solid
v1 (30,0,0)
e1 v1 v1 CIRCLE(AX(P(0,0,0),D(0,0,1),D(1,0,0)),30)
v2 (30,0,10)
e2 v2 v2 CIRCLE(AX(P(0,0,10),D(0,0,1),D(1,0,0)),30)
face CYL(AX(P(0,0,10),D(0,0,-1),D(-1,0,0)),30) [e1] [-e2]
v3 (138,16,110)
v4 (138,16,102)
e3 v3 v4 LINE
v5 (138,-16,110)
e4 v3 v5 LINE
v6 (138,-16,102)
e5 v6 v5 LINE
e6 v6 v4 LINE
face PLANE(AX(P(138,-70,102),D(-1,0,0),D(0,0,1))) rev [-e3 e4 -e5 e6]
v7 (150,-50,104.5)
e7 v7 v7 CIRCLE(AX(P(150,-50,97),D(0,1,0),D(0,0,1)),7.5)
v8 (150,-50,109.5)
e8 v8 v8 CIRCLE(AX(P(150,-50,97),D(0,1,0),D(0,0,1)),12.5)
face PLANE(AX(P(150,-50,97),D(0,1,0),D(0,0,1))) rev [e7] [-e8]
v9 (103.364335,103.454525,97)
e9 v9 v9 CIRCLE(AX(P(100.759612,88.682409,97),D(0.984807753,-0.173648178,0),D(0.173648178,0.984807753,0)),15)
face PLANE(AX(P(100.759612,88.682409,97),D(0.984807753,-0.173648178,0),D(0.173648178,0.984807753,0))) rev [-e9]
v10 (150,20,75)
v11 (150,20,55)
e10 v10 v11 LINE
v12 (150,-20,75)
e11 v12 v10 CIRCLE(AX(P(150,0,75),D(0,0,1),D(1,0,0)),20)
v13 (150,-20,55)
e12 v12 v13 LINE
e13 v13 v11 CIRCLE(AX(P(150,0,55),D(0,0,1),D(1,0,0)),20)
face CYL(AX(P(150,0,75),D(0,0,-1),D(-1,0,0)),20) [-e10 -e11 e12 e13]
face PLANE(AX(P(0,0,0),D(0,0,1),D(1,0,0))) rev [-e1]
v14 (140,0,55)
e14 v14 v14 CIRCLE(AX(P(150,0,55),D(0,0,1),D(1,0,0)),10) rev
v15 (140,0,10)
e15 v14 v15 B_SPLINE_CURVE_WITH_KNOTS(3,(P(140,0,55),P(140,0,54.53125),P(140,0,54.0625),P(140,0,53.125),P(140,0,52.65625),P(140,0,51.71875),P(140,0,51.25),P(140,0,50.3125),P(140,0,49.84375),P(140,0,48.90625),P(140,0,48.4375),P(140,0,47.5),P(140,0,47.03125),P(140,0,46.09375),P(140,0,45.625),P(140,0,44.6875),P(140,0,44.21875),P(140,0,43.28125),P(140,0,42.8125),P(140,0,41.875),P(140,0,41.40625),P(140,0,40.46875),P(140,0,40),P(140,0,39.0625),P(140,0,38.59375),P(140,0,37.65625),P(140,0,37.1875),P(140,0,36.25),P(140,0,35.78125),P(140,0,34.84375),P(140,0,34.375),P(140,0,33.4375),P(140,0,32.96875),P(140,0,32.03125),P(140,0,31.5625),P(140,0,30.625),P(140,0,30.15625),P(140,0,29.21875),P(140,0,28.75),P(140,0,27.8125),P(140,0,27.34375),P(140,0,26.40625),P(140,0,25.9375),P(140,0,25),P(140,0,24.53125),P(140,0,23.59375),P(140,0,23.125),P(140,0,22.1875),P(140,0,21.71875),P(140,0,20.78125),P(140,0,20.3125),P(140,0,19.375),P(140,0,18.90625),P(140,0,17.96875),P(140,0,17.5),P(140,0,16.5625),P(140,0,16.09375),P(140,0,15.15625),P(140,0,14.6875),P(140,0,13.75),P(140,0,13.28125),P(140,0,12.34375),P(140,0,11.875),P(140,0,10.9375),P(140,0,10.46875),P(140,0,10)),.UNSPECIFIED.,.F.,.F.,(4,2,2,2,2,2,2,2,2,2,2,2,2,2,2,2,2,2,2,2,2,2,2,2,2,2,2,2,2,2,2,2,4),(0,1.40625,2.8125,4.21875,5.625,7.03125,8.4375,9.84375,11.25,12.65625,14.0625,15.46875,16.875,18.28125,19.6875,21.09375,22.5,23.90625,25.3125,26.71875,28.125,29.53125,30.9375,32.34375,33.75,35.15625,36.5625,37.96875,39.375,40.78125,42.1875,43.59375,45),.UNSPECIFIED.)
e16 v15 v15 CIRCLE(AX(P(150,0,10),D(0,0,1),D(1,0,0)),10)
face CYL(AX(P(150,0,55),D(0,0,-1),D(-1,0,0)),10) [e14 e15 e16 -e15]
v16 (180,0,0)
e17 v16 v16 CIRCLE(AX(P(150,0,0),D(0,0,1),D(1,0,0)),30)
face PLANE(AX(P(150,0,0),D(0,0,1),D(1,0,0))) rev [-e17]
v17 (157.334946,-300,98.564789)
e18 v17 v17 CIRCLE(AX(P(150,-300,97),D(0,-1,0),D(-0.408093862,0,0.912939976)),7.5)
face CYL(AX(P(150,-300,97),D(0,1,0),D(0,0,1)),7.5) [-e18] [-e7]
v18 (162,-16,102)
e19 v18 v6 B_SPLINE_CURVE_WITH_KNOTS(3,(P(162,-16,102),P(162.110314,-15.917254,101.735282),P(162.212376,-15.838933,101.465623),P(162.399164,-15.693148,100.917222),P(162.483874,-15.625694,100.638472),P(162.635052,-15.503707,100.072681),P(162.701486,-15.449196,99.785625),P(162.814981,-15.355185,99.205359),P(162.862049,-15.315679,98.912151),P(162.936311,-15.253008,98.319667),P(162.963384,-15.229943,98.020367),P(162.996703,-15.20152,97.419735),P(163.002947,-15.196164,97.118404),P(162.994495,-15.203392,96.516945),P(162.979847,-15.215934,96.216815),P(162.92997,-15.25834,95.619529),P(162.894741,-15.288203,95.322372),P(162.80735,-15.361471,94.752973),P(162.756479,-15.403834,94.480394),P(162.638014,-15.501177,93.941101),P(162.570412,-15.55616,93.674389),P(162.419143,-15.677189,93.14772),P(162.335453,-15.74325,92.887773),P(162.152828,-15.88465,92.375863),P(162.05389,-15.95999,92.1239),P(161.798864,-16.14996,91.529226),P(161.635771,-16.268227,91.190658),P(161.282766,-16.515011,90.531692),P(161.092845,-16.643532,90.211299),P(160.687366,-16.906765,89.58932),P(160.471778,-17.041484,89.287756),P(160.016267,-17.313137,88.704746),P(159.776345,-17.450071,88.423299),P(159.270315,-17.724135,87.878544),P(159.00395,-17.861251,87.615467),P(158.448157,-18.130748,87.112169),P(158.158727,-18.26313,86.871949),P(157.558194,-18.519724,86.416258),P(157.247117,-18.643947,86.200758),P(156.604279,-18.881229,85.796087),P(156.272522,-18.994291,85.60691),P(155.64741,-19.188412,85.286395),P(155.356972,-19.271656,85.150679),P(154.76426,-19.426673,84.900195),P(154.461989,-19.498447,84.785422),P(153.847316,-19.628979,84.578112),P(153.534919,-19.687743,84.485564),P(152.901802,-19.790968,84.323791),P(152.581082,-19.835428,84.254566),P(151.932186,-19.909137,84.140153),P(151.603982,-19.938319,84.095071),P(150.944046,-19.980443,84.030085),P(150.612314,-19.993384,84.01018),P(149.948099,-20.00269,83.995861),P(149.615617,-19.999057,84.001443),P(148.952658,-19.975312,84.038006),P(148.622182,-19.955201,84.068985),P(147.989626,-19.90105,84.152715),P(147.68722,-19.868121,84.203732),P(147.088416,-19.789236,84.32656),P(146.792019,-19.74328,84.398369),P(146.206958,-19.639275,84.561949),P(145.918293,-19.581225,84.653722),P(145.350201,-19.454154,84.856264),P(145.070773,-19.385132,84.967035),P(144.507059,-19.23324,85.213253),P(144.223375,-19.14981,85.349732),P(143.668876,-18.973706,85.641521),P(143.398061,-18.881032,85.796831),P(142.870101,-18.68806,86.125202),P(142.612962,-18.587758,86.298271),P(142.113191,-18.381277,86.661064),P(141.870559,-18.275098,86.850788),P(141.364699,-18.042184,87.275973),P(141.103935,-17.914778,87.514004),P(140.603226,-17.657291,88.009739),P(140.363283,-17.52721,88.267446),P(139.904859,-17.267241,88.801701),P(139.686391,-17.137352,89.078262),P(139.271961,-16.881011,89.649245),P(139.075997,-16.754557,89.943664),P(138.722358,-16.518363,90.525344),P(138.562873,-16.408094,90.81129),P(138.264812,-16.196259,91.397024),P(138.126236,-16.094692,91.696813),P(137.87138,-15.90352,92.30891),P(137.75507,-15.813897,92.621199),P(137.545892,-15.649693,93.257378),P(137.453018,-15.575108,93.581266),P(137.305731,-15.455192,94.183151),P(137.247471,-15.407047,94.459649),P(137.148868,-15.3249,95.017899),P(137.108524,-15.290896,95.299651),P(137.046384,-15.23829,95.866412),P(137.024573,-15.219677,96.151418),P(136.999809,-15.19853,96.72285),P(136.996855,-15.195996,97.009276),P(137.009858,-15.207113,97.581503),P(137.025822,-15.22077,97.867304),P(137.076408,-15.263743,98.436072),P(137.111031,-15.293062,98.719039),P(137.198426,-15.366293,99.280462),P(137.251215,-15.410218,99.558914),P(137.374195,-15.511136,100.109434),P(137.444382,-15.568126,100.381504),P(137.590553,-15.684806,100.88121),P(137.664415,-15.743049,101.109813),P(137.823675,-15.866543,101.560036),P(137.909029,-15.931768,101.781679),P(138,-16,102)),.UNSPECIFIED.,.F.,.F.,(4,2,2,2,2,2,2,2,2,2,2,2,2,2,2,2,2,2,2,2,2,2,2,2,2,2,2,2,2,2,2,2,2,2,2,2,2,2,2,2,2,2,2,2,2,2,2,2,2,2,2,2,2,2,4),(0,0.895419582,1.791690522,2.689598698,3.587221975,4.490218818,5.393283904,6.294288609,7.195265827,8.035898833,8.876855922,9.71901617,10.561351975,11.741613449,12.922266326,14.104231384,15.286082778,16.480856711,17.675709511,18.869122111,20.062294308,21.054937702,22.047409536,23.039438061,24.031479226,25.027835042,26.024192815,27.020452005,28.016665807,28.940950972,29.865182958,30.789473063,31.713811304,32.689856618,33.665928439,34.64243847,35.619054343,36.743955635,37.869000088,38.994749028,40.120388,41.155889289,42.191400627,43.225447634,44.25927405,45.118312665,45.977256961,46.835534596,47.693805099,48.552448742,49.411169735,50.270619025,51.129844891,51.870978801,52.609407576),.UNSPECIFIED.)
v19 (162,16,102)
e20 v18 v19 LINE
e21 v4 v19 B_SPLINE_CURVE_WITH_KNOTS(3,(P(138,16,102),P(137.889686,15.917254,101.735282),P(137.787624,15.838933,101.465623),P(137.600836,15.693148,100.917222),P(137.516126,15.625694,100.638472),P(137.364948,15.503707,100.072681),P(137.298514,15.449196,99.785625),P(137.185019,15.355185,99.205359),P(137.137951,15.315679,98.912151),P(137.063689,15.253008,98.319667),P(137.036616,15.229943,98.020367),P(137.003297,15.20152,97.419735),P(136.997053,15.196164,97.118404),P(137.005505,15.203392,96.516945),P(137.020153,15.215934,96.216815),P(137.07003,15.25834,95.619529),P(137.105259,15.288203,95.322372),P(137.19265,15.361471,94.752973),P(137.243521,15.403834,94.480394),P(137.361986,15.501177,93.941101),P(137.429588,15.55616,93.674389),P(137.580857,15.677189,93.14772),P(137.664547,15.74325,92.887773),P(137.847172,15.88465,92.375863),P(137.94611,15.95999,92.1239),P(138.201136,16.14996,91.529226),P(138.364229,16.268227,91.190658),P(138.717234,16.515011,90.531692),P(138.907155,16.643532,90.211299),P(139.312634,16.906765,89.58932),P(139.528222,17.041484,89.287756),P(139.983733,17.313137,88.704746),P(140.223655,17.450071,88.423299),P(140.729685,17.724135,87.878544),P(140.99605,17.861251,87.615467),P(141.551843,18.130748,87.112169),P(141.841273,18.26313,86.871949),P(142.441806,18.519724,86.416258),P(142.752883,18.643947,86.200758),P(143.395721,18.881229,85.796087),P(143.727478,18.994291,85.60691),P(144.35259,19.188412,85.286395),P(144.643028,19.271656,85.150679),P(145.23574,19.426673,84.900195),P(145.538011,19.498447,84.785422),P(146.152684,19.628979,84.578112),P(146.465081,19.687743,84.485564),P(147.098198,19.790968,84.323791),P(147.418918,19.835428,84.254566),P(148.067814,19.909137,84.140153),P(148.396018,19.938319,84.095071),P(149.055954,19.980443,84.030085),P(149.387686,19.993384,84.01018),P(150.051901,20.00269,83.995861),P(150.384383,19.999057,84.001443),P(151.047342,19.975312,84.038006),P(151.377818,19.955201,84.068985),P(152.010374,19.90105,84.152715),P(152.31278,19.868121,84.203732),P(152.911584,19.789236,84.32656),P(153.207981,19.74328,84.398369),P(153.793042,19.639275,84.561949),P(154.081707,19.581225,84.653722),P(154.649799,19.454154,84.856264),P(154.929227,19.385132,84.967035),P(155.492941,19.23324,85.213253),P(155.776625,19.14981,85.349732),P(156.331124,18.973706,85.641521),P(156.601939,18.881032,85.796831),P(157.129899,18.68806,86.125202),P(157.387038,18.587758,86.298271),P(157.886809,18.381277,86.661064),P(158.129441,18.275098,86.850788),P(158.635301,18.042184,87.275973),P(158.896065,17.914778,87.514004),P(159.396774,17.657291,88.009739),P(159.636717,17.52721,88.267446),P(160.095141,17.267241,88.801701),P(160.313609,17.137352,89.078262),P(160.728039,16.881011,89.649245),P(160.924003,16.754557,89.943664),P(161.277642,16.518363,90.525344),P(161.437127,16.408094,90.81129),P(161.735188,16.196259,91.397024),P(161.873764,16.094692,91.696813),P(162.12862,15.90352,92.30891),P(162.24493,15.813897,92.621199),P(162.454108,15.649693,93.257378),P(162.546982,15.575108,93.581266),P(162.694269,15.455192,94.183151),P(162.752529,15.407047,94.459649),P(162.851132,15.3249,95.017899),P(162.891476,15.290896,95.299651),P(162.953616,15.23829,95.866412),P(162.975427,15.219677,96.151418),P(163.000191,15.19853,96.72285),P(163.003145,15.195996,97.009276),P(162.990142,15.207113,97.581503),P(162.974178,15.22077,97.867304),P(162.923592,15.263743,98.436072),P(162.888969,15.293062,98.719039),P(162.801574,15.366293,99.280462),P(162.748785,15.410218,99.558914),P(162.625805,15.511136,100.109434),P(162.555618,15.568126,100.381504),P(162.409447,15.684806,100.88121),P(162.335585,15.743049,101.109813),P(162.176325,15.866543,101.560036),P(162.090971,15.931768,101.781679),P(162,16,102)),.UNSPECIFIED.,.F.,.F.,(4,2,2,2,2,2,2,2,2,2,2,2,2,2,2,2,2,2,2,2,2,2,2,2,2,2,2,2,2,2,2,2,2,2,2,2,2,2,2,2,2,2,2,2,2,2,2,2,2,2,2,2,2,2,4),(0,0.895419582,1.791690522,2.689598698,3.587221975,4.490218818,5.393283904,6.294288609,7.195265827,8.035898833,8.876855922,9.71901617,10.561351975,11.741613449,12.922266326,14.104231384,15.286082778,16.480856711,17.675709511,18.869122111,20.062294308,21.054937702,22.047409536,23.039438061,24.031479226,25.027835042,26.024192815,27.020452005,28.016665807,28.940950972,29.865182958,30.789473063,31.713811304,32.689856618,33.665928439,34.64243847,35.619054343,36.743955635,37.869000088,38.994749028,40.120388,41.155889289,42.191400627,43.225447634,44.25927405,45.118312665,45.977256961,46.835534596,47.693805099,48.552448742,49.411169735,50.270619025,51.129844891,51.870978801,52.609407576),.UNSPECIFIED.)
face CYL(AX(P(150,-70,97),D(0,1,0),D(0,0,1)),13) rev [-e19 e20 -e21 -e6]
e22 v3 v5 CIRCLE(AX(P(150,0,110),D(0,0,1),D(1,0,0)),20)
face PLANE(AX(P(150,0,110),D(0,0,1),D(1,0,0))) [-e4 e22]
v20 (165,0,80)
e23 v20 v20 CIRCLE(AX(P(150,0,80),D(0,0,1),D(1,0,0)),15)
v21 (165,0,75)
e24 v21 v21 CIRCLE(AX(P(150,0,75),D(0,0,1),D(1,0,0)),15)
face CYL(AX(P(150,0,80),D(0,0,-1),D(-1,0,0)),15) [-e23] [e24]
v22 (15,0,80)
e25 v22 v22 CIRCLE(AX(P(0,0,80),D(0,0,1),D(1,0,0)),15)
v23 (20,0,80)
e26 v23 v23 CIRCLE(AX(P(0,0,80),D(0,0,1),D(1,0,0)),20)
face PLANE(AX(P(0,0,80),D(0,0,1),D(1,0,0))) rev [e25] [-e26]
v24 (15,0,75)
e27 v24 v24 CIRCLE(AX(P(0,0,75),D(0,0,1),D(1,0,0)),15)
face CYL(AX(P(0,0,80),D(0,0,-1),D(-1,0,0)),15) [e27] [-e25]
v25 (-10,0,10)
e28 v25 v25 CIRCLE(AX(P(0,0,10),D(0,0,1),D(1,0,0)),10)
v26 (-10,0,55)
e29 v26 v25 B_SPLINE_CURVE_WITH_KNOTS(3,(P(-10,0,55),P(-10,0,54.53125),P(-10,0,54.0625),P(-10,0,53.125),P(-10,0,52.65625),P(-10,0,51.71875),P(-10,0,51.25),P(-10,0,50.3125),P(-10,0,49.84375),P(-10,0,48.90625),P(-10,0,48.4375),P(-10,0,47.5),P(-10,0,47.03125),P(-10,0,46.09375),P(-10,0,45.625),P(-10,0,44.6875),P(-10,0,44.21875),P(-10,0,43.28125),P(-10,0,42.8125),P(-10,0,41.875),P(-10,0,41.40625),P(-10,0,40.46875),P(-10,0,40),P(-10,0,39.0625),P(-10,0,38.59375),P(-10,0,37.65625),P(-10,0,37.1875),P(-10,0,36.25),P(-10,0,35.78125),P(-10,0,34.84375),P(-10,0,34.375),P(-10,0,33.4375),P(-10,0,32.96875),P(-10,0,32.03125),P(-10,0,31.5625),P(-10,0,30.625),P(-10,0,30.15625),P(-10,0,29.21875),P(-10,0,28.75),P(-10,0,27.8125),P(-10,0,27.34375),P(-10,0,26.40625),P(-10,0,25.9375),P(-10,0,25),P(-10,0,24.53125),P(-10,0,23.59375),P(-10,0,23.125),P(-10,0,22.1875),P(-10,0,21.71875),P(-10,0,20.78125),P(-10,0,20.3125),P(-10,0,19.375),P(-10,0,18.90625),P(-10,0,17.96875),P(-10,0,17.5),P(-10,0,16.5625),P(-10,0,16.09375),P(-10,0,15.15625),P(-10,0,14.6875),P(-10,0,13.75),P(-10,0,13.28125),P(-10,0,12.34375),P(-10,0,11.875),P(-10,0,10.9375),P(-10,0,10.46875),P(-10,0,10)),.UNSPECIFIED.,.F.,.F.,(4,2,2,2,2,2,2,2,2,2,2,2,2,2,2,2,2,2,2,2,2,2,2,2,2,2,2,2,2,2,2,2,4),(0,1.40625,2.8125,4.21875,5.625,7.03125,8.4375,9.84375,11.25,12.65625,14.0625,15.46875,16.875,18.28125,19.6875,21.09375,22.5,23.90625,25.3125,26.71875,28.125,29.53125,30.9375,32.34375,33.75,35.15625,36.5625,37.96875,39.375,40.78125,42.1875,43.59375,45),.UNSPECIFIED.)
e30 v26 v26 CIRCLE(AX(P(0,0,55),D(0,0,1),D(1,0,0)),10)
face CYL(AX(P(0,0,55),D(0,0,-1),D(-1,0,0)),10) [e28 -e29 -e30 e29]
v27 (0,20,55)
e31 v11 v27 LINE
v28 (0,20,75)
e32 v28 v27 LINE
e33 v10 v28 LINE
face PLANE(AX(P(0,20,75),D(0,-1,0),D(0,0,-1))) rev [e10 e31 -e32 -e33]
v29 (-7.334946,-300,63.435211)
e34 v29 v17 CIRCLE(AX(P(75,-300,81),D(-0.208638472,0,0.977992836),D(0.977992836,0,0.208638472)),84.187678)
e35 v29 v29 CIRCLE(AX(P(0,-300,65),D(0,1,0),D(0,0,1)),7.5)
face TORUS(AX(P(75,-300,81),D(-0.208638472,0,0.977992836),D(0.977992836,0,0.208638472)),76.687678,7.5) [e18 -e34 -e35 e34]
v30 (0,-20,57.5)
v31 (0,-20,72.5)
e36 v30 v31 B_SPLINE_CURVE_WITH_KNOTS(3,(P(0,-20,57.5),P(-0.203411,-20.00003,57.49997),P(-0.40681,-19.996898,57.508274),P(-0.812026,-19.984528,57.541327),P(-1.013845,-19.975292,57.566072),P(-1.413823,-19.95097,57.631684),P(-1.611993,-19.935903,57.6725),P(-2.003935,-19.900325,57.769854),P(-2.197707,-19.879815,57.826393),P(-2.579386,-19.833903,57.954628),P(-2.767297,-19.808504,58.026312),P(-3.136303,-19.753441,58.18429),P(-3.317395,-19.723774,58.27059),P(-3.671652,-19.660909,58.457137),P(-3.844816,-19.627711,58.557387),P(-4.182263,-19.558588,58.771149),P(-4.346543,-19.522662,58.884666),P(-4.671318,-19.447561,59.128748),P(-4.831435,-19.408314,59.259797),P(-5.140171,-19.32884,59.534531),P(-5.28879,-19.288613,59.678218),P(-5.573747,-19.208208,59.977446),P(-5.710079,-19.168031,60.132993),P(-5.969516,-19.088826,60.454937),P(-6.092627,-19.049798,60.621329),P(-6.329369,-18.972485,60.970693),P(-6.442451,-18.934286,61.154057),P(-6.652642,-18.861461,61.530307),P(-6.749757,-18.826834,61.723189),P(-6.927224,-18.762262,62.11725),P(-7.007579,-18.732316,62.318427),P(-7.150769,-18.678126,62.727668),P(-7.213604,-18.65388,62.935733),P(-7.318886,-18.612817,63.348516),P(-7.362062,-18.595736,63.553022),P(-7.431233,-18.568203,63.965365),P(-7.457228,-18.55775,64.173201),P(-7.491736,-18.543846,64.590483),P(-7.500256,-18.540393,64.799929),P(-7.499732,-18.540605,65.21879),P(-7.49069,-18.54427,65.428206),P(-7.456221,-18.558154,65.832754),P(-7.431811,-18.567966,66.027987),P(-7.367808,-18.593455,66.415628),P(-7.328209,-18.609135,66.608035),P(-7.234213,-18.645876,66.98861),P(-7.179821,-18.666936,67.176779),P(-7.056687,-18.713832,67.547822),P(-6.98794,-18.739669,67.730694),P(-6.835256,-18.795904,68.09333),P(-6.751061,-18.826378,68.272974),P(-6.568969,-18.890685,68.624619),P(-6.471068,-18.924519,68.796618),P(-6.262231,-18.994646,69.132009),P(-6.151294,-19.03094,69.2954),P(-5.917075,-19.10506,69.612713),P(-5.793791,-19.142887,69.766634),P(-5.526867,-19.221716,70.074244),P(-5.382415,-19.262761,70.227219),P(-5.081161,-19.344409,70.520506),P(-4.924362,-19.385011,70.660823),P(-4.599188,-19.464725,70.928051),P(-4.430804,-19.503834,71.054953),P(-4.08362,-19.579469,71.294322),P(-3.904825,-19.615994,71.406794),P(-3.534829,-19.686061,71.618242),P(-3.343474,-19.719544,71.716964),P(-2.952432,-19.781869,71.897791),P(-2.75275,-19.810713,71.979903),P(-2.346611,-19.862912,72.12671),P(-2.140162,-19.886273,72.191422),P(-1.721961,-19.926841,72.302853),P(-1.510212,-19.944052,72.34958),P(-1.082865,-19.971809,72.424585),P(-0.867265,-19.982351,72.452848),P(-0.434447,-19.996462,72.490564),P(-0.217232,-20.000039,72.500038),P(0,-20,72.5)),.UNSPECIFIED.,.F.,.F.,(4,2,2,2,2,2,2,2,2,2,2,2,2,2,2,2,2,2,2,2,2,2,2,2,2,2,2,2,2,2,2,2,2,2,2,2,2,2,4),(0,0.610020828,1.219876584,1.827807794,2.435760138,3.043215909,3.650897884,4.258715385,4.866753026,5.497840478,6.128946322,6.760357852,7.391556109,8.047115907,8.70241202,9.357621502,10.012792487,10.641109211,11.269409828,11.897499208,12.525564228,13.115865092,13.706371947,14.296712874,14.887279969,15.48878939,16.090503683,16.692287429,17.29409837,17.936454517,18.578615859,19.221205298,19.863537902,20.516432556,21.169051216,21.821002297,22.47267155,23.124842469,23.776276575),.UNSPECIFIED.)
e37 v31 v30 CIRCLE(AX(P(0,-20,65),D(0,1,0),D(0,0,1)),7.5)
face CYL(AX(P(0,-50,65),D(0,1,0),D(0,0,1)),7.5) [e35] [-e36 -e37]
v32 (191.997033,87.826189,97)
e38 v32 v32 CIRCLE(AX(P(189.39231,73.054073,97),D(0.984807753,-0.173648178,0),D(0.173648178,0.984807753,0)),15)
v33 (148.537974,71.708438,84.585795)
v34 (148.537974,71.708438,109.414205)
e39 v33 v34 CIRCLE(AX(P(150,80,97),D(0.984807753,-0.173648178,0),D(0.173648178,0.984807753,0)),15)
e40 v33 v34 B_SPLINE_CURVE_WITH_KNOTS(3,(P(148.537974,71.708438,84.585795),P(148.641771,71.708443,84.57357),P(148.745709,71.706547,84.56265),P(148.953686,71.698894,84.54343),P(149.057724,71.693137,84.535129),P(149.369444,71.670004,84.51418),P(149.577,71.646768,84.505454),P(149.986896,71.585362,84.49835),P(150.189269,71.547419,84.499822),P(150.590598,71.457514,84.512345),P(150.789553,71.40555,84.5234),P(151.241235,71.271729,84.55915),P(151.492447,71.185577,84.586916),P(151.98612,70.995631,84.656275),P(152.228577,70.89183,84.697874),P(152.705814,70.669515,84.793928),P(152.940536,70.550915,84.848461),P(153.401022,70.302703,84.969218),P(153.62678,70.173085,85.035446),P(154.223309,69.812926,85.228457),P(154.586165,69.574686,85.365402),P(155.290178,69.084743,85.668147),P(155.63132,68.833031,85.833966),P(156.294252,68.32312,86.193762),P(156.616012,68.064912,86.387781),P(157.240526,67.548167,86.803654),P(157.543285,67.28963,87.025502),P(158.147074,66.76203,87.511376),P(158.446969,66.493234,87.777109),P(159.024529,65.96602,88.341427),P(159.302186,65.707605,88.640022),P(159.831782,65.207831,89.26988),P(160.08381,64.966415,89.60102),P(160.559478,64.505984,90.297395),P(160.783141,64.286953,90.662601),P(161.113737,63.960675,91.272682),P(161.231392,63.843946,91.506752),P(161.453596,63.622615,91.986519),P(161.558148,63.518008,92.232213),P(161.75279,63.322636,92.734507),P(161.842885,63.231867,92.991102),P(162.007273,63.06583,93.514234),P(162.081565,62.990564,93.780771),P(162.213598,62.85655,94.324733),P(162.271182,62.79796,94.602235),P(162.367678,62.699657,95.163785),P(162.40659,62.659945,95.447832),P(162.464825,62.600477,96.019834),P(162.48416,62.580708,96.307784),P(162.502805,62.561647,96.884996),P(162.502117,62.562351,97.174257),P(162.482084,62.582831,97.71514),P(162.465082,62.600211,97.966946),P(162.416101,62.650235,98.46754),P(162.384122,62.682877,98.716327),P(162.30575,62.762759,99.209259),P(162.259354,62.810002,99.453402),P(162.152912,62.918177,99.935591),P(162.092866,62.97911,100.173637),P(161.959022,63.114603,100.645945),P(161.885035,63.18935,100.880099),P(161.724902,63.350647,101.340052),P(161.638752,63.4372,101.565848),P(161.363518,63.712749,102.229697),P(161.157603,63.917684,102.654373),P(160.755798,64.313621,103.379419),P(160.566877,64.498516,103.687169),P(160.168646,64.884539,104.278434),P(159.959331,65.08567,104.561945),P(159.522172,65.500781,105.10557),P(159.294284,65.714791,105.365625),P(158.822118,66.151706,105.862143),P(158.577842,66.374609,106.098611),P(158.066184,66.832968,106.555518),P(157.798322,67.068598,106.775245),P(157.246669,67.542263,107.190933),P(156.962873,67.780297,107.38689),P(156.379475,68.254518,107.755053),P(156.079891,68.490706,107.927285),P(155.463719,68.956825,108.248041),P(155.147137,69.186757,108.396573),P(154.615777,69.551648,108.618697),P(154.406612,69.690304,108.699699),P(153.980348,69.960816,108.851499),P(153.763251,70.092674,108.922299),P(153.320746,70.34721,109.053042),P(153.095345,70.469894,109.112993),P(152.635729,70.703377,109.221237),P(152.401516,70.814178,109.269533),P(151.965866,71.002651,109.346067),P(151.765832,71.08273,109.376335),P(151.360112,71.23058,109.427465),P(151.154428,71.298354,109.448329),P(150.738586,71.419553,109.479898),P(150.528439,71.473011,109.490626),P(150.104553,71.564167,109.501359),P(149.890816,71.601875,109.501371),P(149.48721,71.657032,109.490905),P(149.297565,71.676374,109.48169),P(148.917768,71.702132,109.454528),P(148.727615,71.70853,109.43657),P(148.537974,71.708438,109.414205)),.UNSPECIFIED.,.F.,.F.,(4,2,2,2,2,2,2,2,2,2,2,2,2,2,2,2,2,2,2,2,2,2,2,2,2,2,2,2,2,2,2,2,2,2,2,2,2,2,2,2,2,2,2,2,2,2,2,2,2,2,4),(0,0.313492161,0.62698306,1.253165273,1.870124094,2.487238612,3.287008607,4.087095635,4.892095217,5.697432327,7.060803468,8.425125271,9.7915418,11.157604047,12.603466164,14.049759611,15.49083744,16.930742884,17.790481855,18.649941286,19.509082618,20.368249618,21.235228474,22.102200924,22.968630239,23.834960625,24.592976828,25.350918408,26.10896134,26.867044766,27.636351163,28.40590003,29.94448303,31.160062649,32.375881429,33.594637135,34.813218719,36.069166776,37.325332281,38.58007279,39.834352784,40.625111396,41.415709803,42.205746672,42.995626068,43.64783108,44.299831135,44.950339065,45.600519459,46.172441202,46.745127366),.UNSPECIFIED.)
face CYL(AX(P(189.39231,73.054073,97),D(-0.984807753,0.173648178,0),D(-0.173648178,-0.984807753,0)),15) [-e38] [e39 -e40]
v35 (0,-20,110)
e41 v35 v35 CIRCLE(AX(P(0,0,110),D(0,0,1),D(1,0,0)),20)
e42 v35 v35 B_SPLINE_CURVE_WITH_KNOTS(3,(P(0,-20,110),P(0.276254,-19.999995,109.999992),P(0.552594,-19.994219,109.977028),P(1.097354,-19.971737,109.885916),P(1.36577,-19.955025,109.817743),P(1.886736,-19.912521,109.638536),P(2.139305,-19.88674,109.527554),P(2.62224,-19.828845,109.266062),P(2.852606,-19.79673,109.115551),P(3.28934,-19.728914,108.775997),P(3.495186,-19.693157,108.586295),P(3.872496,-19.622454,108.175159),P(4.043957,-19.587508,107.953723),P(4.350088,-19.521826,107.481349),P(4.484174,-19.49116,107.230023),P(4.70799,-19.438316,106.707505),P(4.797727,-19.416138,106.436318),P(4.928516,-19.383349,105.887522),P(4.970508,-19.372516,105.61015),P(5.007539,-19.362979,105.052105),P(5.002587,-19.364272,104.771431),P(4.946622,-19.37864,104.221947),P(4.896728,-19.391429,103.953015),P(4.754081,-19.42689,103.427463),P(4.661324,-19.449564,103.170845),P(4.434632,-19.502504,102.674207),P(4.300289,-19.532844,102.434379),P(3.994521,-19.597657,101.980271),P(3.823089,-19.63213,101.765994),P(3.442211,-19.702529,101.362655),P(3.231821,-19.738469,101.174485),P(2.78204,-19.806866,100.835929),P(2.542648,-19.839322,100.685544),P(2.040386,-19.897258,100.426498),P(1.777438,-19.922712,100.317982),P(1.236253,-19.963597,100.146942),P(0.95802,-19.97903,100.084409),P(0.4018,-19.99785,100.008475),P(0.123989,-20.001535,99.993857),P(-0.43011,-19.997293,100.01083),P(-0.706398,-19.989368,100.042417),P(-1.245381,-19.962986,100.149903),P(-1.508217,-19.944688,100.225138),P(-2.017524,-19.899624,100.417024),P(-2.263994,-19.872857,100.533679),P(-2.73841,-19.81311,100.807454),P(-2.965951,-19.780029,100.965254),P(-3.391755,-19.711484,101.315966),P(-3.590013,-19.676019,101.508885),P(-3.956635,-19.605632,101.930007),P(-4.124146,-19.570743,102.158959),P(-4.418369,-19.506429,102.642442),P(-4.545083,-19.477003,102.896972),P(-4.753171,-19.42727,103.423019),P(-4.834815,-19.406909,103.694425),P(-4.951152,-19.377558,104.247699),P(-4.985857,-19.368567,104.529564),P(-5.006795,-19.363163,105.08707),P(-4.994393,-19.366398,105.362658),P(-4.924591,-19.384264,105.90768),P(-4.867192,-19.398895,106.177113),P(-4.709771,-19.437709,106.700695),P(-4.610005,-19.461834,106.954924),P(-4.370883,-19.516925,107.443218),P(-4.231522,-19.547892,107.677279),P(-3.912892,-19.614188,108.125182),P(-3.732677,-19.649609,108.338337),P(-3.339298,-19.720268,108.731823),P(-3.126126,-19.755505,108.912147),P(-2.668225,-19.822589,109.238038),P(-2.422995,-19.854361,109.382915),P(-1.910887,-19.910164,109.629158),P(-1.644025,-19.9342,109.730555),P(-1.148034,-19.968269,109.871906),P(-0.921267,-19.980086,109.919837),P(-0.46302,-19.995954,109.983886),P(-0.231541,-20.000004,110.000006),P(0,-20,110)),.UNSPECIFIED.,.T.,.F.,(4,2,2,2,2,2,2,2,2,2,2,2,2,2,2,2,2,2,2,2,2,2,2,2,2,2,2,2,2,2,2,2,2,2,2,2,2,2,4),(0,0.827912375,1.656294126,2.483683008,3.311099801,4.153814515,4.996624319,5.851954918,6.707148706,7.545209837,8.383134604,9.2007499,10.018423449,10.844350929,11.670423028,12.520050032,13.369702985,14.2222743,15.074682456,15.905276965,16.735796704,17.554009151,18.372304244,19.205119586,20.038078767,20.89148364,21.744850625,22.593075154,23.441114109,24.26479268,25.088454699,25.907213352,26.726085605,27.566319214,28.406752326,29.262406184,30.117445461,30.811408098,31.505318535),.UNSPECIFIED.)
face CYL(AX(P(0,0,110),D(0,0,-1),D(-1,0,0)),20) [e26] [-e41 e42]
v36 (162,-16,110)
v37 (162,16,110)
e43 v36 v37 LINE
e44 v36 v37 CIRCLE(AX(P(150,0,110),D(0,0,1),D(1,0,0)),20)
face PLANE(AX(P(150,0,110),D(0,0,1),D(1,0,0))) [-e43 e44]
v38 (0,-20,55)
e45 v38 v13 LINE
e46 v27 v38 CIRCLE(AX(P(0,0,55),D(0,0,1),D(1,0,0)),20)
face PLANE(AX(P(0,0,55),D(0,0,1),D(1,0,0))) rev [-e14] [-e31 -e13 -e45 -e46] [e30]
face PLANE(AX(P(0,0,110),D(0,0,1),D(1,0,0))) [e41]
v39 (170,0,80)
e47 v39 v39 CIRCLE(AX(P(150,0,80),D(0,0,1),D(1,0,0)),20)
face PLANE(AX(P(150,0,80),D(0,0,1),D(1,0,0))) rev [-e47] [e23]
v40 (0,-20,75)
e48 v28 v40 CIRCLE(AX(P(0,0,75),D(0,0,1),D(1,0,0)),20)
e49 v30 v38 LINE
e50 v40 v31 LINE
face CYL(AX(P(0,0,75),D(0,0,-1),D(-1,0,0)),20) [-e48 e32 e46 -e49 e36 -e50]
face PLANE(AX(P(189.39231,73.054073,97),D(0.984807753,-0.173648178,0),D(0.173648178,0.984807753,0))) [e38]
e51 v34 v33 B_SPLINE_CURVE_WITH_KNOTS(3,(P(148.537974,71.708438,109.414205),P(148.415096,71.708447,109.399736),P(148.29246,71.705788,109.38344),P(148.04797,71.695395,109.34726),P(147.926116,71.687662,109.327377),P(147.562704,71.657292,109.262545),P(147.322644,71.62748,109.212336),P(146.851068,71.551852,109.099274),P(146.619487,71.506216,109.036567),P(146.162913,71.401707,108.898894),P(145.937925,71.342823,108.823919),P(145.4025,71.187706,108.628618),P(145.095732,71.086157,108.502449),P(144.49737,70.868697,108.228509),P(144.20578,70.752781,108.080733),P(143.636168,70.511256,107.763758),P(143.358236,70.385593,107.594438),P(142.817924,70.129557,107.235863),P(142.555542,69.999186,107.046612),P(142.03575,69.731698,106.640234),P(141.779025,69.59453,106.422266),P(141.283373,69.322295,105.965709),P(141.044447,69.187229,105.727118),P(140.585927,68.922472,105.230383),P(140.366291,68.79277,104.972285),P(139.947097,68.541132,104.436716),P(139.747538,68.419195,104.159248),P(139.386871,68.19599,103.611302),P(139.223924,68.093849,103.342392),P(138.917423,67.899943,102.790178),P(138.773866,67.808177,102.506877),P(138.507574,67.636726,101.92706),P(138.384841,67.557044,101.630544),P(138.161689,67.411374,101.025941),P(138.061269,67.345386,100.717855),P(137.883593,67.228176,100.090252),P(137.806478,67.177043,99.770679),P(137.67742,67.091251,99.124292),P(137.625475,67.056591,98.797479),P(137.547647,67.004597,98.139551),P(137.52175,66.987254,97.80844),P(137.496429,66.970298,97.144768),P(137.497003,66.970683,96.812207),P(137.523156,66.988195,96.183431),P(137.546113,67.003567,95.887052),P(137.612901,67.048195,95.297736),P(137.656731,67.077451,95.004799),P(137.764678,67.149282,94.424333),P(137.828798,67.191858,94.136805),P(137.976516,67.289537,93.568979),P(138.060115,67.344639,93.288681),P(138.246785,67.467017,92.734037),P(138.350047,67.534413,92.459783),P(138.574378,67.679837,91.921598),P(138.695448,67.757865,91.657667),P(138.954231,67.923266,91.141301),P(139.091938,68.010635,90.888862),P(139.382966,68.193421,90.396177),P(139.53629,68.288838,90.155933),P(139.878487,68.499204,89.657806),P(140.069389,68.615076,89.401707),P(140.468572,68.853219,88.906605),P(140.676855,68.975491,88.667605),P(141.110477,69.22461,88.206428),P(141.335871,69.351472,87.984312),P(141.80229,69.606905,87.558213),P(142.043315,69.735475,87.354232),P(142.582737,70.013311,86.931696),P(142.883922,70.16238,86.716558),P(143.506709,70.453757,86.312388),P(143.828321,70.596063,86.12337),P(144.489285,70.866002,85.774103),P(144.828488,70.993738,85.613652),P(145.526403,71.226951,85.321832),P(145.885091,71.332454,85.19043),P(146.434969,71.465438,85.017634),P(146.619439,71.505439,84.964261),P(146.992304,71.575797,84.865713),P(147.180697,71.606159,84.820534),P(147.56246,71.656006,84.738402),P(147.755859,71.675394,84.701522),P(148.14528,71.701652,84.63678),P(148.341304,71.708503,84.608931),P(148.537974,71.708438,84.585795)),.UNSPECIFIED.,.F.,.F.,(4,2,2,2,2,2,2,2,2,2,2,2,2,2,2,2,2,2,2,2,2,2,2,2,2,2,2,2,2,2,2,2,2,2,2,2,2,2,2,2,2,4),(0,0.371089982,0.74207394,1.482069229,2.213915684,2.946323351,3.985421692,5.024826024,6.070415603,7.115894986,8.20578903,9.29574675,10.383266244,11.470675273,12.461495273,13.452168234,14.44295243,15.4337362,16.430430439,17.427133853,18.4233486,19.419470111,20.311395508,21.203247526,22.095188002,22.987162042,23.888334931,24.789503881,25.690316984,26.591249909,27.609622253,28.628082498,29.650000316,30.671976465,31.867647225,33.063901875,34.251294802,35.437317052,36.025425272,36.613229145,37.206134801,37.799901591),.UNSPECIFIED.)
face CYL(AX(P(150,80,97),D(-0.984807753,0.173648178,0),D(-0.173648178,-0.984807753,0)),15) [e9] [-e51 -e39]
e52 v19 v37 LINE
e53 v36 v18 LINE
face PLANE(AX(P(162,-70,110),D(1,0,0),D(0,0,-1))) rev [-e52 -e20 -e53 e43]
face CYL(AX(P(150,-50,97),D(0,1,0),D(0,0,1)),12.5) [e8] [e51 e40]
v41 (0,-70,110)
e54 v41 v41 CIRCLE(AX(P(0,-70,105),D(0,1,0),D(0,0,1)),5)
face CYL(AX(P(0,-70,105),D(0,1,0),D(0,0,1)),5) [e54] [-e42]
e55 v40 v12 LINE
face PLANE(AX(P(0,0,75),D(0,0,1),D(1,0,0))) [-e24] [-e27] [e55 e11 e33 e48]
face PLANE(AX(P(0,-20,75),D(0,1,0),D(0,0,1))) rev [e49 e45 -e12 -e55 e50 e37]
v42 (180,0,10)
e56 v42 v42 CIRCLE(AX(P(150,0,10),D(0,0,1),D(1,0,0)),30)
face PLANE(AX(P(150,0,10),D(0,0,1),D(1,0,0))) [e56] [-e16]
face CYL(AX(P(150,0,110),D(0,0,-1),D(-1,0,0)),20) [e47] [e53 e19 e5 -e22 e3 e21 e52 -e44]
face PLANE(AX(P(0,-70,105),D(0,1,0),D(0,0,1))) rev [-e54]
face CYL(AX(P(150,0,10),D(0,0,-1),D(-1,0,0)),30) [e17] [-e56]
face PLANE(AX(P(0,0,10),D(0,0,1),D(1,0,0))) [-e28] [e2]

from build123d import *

# Parameters (mm, degrees)
SKETCH_1_R               = 30
EXTRUDE_1_DEPTH          = 10
EXTRUDE_1_2_DEPTH        = 10
SKETCH_2_R               = 10
EXTRUDE_2_DEPTH          = 45
EXTRUDE_3_DEPTH          = 20
SKETCH_4_R               = 15
EXTRUDE_4_DEPTH          = 5
SKETCH_5_R               = 20
EXTRUDE_5_DEPTH          = 30
SKETCH_6_R               = 5
EXTRUDE_6_DEPTH          = 70
CUT_EXTRUDE_1_DEPTH      = 223.26110779
CUT_EXTRUDE_1_DEPTH_BACK = 223.26110779
SKETCH_9_R               = 7.5
EXTRUDE_7_DEPTH          = 50
SWEEP_START              = -300.0000001
SWEEP_1_OUTLINE_R        = 7.5
SWEEP_1_DEPTH            = 300.0000001
SWEEP_1_2_OUTLINE_R      = 7.5
SWEEP_1_2_ANGLE          = 180
EXTRUDE_8_DEPTH          = 80
EXTRUDE_8_DEPTH_BACK     = 50
SKETCH_10_R              = 12.5
SWEEP_2_PROFILE_R        = 15


with BuildPart() as part:
    # Эскиз1 → Бобышка-Вытянуть1 (new body)
    with BuildSketch(Plane.XY):
        Circle(SKETCH_1_R)
    extrude(amount=EXTRUDE_1_DEPTH)



with BuildPart() as body_2:
    # Эскиз1 → Extrude 1 2 (new body)
    with BuildSketch(Plane.XY):
        with Locations((150, 0)):
            Circle(SKETCH_1_R)
    extrude(amount=EXTRUDE_1_2_DEPTH)


with BuildPart() as part_1:
    add(part.part)

    add(body_2.part)  # Бобышка-Вытянуть2 merges body 2
    # Эскиз2 → Бобышка-Вытянуть2 (add)
    with BuildSketch(Plane.XY.offset(10)):
        with Locations(Location((0, 0, 0), (0, 0, 180))):
            Circle(SKETCH_2_R)
        with Locations(Location((150, 0, 0), (0, 0, 180))):
            Circle(SKETCH_2_R)
    extrude(amount=EXTRUDE_2_DEPTH)

    # Эскиз3 → Бобышка-Вытянуть3 (add)
    with BuildSketch(Plane.XY.offset(55)):
        with BuildLine():
            Line((0, 20), (150, 20))
            ThreePointArc((150, 20), (170, 0), (150, -20))
            Line((150, -20), (0, -20))
            ThreePointArc((0, -20), (-20, 0), (0, 20))
        make_face()
    extrude(amount=EXTRUDE_3_DEPTH)

    # Эскиз4 → Бобышка-Вытянуть4 (add)
    with BuildSketch(Plane.XY.offset(75)):
        Circle(SKETCH_4_R)
        with Locations((150, 0)):
            Circle(SKETCH_4_R)
    extrude(amount=EXTRUDE_4_DEPTH)

    # Эскиз5 → Бобышка-Вытянуть5 (add)
    with BuildSketch(Plane.XY.offset(80)):
        Circle(SKETCH_5_R)
        with Locations((150, 0)):
            Circle(SKETCH_5_R)
    extrude(amount=EXTRUDE_5_DEPTH)

    # Эскиз6 → Бобышка-Вытянуть6 (add)
    with BuildSketch(Plane(origin=(0, 0, 0), x_dir=(1, 0, 0), z_dir=(0, 1, 0))):
        with Locations(Location((0, -105, 0), (0, 0, 270))):
            Circle(SKETCH_6_R)
    extrude(amount=-EXTRUDE_6_DEPTH)

    # Эскиз8 → Вырез-Вытянуть1 (cut, two sides: drawn at the far end of the back side and taken through both)
    with BuildSketch(Plane(origin=(0, 0, 0), x_dir=(1, 0, 0), z_dir=(0, 1, 0)).offset(-CUT_EXTRUDE_1_DEPTH_BACK)):
        with BuildLine():
            Line((138, -102), (138, -110))
            Line((138, -110), (162, -110))
            Line((162, -110), (162, -102))
            ThreePointArc((162, -102), (150, -84), (138, -102))
        make_face()
    extrude(amount=CUT_EXTRUDE_1_DEPTH + CUT_EXTRUDE_1_DEPTH_BACK, mode=Mode.SUBTRACT)

    # Эскиз9 → Бобышка-Вытянуть7 (add)
    with BuildSketch(Plane(origin=(0, 0, 0), x_dir=(1, 0, 0), z_dir=(0, 1, 0))):
        with Locations(Location((0, -65, 0), (0, 0, 270))):
            Circle(SKETCH_9_R)
    extrude(amount=-EXTRUDE_7_DEPTH)

    # По траектории1: read off the stored shape, not the designer's step
    # По траектории1 outline → По траектории1 (add)
    with BuildSketch(Plane(origin=(0, 0, 0), x_dir=(1, 0, 0), z_dir=(0, 1, 0)).offset(SWEEP_START)):
        with Locations((0, -65)):
            Circle(SWEEP_1_OUTLINE_R)
        with Locations((150, -97)):
            Circle(SWEEP_1_OUTLINE_R)
    extrude(amount=SWEEP_1_DEPTH)

    # Sweep 1 2 outline → Sweep 1 2 (revolve)
    with BuildSketch(Plane(origin=(88.263050502, -300, 18.829450774), x_dir=(0.9779928364243075, 0, 0.20863847177051914), z_dir=(0, 1, 0))):
        with Locations((76.68767828, -63.569534368)):
            Circle(SWEEP_1_2_OUTLINE_R)
    revolve(axis=Axis((88.263050502, -300, 18.829450774), (0.20863847177051914, 0, -0.9779928364243075)), revolution_arc=SWEEP_1_2_ANGLE)

    # Эскиз10 → Бобышка-Вытянуть8 (add, two sides: drawn at the far end of the back side and taken through both)
    with BuildSketch(Plane(origin=(0, 0, 0), x_dir=(1, 0, 0), z_dir=(0, 1, 0)).offset(-EXTRUDE_8_DEPTH_BACK)):
        with Locations(Location((150, -97, 0), (0, 0, 270))):
            Circle(SKETCH_10_R)
    extrude(amount=EXTRUDE_8_DEPTH + EXTRUDE_8_DEPTH_BACK)

    # По траектории2: sweep along a path in Эскиз11
    with BuildLine(Plane.XY.offset(97)) as sweep_2_path:
        Line((189.39231012, 73.054072893), (150, 80))
        Line((150, 80), (100.759612349, 88.682408883))
    # По траектории2 profile (on start of the path) → По траектории2 (sweep)
    with BuildSketch(Plane(origin=(189.39231012, 73.054072893, 97), x_dir=(-0.17364817766693041, -0.9848077530122081, 0), z_dir=(-0.9848077530122081, 0.17364817766693041, 0))):
        Circle(SWEEP_2_PROFILE_R)
    sweep(path=sweep_2_path.line)


solid = part_1.part
